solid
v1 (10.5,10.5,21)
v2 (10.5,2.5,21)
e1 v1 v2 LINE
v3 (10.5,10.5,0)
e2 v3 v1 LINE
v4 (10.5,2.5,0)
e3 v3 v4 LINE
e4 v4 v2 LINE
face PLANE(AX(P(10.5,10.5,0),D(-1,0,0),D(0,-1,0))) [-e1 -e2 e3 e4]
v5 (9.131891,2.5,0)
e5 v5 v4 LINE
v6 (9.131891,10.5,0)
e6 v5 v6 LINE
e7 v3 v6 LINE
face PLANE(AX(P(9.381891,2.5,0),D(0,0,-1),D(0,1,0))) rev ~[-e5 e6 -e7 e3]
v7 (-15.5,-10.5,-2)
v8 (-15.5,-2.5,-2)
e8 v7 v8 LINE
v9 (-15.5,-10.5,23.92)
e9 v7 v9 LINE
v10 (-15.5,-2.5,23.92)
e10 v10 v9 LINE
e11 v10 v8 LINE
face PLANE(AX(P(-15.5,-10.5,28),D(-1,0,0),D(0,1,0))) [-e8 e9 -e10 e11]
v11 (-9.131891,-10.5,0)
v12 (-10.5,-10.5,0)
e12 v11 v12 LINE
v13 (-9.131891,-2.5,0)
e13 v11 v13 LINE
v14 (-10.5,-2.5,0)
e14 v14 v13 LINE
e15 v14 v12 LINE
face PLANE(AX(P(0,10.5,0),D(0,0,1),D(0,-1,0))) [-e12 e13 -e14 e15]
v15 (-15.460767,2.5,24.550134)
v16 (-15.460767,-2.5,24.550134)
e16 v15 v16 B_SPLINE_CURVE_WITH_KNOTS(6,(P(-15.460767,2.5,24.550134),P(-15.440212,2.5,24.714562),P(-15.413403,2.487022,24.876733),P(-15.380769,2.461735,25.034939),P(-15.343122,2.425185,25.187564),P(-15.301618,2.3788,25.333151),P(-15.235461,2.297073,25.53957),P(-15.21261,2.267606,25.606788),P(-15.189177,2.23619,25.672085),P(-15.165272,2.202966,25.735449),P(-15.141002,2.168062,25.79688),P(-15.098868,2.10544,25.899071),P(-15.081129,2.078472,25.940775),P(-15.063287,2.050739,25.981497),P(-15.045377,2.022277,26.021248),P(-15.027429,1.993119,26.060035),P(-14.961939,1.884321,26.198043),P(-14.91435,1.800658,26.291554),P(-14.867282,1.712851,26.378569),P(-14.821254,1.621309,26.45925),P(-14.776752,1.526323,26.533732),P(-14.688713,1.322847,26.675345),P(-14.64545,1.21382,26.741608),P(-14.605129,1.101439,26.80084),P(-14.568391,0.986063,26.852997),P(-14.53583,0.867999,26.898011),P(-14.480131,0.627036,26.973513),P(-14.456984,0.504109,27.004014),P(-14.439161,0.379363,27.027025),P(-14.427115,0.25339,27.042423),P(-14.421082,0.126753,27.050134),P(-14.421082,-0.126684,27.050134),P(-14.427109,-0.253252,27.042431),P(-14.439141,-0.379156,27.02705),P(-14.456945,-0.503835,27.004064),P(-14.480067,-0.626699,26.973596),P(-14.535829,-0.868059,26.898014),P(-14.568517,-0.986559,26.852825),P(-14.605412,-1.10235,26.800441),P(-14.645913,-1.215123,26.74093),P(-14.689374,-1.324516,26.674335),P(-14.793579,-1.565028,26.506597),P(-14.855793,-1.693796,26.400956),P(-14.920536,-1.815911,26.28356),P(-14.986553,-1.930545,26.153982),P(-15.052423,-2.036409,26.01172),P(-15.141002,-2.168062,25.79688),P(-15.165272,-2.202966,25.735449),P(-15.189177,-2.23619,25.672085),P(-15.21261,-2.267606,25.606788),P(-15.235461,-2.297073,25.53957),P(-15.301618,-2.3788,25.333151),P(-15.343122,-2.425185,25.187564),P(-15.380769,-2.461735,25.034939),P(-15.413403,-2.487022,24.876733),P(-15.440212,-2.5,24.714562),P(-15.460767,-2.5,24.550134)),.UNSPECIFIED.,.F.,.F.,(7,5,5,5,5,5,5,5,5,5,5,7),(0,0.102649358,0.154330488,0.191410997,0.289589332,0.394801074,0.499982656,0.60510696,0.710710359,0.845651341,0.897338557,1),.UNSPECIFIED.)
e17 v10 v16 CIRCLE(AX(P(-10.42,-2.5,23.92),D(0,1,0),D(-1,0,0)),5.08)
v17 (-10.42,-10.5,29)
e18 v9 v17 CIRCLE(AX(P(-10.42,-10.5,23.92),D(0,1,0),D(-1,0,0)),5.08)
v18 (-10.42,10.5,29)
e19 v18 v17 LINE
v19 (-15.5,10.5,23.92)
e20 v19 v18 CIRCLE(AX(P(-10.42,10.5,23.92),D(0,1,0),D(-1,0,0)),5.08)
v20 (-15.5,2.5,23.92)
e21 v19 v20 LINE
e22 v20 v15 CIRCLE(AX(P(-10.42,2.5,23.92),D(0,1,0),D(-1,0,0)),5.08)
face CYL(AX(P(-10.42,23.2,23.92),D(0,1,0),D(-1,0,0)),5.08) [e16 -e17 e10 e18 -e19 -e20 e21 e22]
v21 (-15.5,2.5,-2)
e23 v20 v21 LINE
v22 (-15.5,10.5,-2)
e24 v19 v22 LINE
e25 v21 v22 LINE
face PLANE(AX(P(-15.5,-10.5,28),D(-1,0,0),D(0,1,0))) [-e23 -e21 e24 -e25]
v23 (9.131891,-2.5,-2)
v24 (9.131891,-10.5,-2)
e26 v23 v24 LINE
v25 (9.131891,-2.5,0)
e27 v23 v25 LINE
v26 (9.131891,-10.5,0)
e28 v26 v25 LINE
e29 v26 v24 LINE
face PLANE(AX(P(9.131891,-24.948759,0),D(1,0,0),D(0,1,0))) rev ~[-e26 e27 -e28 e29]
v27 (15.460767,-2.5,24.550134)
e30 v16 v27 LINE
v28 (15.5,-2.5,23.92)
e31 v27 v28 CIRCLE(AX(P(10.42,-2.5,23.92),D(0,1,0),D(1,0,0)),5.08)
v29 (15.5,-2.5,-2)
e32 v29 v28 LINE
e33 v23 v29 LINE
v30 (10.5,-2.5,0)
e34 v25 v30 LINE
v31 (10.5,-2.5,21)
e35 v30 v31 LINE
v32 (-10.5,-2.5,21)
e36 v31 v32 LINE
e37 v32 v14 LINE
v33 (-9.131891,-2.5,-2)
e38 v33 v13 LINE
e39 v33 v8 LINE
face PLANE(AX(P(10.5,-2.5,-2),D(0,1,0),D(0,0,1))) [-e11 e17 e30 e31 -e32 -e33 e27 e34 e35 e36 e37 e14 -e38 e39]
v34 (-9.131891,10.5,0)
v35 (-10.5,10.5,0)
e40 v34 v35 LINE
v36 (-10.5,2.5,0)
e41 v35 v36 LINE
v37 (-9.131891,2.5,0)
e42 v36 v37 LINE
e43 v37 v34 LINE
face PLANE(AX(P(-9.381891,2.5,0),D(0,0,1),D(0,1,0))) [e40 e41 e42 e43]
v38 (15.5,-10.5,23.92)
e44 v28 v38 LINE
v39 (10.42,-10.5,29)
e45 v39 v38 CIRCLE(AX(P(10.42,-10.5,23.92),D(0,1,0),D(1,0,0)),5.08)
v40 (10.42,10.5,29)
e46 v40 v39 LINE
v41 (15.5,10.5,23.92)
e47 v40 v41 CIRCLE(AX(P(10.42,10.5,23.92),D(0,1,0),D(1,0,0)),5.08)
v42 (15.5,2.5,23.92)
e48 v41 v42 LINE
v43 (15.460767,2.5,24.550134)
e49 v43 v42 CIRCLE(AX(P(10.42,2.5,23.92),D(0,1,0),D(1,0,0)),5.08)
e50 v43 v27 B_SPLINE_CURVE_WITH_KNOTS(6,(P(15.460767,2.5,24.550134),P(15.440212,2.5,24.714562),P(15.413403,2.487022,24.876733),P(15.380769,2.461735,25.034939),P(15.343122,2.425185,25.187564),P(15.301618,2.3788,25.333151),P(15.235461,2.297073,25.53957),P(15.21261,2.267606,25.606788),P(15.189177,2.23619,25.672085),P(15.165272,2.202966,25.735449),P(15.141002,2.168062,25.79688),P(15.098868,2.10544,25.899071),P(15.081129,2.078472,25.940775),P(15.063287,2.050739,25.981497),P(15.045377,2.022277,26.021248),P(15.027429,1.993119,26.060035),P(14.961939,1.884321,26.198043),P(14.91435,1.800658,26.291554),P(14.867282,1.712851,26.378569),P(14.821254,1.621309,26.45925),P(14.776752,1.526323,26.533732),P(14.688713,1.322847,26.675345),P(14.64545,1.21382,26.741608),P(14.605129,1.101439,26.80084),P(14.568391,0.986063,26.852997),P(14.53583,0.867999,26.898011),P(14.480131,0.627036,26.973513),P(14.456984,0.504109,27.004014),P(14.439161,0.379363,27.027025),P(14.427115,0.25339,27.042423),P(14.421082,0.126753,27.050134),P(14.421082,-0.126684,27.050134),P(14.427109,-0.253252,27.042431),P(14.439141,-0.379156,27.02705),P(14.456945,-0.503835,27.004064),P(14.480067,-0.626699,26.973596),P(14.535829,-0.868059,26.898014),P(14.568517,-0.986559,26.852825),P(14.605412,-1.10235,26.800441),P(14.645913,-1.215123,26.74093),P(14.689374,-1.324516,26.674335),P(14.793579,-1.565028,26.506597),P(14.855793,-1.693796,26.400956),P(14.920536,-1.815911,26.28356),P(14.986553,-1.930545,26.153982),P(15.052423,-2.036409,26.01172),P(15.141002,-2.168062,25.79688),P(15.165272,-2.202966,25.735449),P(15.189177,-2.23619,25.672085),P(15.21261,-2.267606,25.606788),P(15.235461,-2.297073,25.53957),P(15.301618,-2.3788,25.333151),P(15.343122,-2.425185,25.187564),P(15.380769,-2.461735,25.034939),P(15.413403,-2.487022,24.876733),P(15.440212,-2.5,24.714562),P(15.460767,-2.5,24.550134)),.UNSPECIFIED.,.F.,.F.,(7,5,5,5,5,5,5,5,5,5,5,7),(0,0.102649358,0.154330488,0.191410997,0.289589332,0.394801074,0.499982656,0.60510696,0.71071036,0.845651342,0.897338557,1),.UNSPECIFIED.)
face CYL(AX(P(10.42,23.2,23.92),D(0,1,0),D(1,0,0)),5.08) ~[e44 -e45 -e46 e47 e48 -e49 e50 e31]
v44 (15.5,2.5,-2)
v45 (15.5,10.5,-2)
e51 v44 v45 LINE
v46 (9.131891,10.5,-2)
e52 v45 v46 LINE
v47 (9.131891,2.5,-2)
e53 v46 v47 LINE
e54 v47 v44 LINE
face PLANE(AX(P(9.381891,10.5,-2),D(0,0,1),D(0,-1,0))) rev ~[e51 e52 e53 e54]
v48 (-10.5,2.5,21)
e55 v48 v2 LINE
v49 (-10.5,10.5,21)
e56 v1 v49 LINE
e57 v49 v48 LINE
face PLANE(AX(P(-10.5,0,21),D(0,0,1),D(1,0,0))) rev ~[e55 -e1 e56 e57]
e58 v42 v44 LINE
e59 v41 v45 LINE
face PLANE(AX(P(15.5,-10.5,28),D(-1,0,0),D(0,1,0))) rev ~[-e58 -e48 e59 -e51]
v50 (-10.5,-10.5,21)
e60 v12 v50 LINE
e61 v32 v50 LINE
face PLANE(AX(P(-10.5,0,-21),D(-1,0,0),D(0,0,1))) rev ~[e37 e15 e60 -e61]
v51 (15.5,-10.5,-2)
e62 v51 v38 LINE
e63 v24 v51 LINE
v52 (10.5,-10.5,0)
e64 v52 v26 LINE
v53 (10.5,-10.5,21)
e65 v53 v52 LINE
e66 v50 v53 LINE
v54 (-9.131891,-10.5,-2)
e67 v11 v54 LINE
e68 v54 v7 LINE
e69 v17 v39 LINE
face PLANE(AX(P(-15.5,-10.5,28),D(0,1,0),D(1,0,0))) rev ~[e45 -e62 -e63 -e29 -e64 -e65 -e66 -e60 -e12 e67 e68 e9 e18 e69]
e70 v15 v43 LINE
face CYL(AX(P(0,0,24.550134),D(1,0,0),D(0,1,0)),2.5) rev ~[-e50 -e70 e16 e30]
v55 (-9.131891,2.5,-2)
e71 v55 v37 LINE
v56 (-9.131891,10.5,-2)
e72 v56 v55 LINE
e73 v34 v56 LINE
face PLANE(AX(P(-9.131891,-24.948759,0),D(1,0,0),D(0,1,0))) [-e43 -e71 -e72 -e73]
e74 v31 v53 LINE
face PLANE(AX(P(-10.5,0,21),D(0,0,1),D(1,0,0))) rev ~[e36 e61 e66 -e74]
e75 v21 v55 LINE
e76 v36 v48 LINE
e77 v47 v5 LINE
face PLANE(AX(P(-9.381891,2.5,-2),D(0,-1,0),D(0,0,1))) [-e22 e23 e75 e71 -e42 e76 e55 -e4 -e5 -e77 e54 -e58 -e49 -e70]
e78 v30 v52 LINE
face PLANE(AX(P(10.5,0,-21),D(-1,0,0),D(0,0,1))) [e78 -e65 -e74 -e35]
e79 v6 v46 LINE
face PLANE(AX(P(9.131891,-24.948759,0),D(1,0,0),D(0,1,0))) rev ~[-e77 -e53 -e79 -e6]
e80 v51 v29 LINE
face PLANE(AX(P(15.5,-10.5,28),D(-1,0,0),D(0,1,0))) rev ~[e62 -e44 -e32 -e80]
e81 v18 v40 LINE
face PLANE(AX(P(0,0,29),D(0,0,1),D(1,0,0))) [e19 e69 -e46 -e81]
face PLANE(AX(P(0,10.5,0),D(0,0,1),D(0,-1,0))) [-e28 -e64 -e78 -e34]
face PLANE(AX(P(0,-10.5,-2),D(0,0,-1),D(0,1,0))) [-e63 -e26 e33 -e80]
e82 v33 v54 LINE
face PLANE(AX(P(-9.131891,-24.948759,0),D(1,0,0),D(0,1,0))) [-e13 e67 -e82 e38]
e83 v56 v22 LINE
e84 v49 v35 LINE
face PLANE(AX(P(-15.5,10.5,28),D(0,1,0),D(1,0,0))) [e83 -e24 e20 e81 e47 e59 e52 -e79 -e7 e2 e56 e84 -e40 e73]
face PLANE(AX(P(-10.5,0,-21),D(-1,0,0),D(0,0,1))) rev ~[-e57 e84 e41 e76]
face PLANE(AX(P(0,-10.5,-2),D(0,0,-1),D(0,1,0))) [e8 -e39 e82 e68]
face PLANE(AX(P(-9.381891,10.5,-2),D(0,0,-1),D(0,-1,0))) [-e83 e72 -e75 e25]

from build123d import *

# Parameters (mm, degrees)
F0_W         = 31
F0_H         = 21
F1_DEPTH     = 28
F2_W         = 21
F2_H         = 42
F3_DEPTH     = 50.8
F4_DEPTH     = 25.4
F6_DEPTH     = 25.4
F7_DEPTH     = 25.4
F8_DEPTH     = 2
F9_W         = 10.5
F9_H         = 2
F10_DEPTH    = 10.5
F11_DEPTH    = 10.5
F12_W        = 18.7637824565
F12_H        = 49.8975180089
F13_DEPTH    = 25.4
F14_DEPTH    = 25.4
F15_DEPTH    = 0.25
F16_DEPTH    = 0.25
F17_DEPTH    = 1
F18_T1_DEPTH = 46.4


# Not quite as in the source:
# - a fillet or chamfer that OpenCascade refuses, or shapes differently, is made with other operations: its cross-section is extruded or revolved along the edge and cut away or added


with BuildPart() as f1:
    # F0 (on Top) → F1 (new body)
    with BuildSketch(Plane.XY):
        Rectangle(F0_W, F0_H)
    extrude(amount=F1_DEPTH)

    # F2 (on Front) → F3 (cut)
    with BuildSketch(Plane.XZ):
        Rectangle(F2_W, F2_H)
    extrude(amount=-F3_DEPTH, mode=Mode.SUBTRACT)

    # F2 (on Front) → F4 (cut)
    with BuildSketch(Plane.XZ):
        Rectangle(F2_W, F2_H)
    extrude(amount=F4_DEPTH, mode=Mode.SUBTRACT)

    # F5 (on Right) → F6 (cut)
    with BuildSketch(Plane.YZ):
        with BuildLine():
            Line((0, 24.5501343161), (2.5, 24.5501343161))
            ThreePointArc((2.5, 24.5501343161), (0, 27.0501343161), (-2.5, 24.5501343161))
            Line((-2.5, 24.5501343161), (0, 24.5501343161))
        make_face()
        with BuildLine():
            Line((2.5, -28.5555105656), (2.5, 24.5501343161))
            ThreePointArc((2.5, 24.5501343161), (1.767766953, 22.7823673631), (0, 22.0501343161))
            Line((0, 22.0501343161), (0, -28.5555105656))
            Line((0, -28.5555105656), (2.5, -28.5555105656))
        make_face()
        with BuildLine():
            ThreePointArc((0, 22.0501343161), (1.767766953, 22.7823673631), (2.5, 24.5501343161))
            Line((2.5, 24.5501343161), (0, 24.5501343161))
            Line((0, 24.5501343161), (0, 22.0501343161))
        make_face()
        with BuildLine():
            Line((0, 24.5501343161), (-2.5, 24.5501343161))
            ThreePointArc((-2.5, 24.5501343161), (-1.767766953, 22.7823673631), (0, 22.0501343161))
            Line((0, 22.0501343161), (0, 24.5501343161))
        make_face()
        with BuildLine():
            ThreePointArc((0, 22.0501343161), (-1.767766953, 22.7823673631), (-2.5, 24.5501343161))
            Line((-2.5, 24.5501343161), (-2.5, -33.7370373309))
            Line((-2.5, -33.7370373309), (0, -33.7370373309))
            Line((0, -33.7370373309), (0, -28.5555105656))
            Line((0, -28.5555105656), (0, 22.0501343161))
        make_face()
    extrude(amount=-F6_DEPTH, mode=Mode.SUBTRACT)

    # F5 (on Right) → F7 (cut)
    with BuildSketch(Plane.YZ):
        with BuildLine():
            Line((0, 24.5501343161), (2.5, 24.5501343161))
            ThreePointArc((2.5, 24.5501343161), (0, 27.0501343161), (-2.5, 24.5501343161))
            Line((-2.5, 24.5501343161), (0, 24.5501343161))
        make_face()
        with BuildLine():
            Line((2.5, -28.5555105656), (2.5, 24.5501343161))
            ThreePointArc((2.5, 24.5501343161), (1.767766953, 22.7823673631), (0, 22.0501343161))
            Line((0, 22.0501343161), (0, -28.5555105656))
            Line((0, -28.5555105656), (2.5, -28.5555105656))
        make_face()
        with BuildLine():
            ThreePointArc((0, 22.0501343161), (1.767766953, 22.7823673631), (2.5, 24.5501343161))
            Line((2.5, 24.5501343161), (0, 24.5501343161))
            Line((0, 24.5501343161), (0, 22.0501343161))
        make_face()
        with BuildLine():
            Line((0, 24.5501343161), (-2.5, 24.5501343161))
            ThreePointArc((-2.5, 24.5501343161), (-1.767766953, 22.7823673631), (0, 22.0501343161))
            Line((0, 22.0501343161), (0, 24.5501343161))
        make_face()
        with BuildLine():
            ThreePointArc((0, 22.0501343161), (-1.767766953, 22.7823673631), (-2.5, 24.5501343161))
            Line((-2.5, 24.5501343161), (-2.5, -33.7370373309))
            Line((-2.5, -33.7370373309), (0, -33.7370373309))
            Line((0, -33.7370373309), (0, -28.5555105656))
            Line((0, -28.5555105656), (0, 22.0501343161))
        make_face()
    extrude(amount=F7_DEPTH, mode=Mode.SUBTRACT)

    # F8 (add): faces of the model
    f8_faces = [f1.faces().sort_by_distance(p)[0] for p in [
        (13, 6.5, 0),
        (13, -6.5, 0),
        (-13, -6.5, 0),
        (-13, 6.5, 0),
    ]]
    extrude(f8_faces, amount=F8_DEPTH)

    # F9 (on Right) → F10 (join)
    with BuildSketch(Plane.YZ):
        with Locations((-5.25, -1)):
            Rectangle(F9_W, F9_H)
        with Locations((5.25, -1)):
            Rectangle(F9_W, F9_H)
    extrude(amount=F10_DEPTH)

    # F11 (add): a face of the model
    f11_faces = [f1.faces().sort_by_distance(p)[0] for p in [
        (0, 0, -1),
    ]]
    extrude(f11_faces, amount=F11_DEPTH)

    # F12 (on Top) → F13 (cut)
    with BuildSketch(Plane.XY):
        Rectangle(F12_W, F12_H)
    extrude(amount=-F13_DEPTH, mode=Mode.SUBTRACT)

    # F14 (cut): a face of the model
    f14_faces = [f1.faces().sort_by_distance(p)[0] for p in [
        (10.5, 0, -1),
    ]]
    extrude(f14_faces, amount=-F14_DEPTH, mode=Mode.SUBTRACT)

    # F15 (add): faces of the model
    f15_faces = [f1.faces().sort_by_distance(p)[0] for p in [
        (9.3818912283, 6.5, -1),
        (9.3818912283, -6.5, -1),
    ]]
    extrude(f15_faces, amount=F15_DEPTH)

    # F16 (add): faces of the model
    f16_faces = [f1.faces().sort_by_distance(p)[0] for p in [
        (-9.3818912283, 6.5, -1),
        (-9.3818912283, -6.5, -1),
    ]]
    extrude(f16_faces, amount=F16_DEPTH)

    # F17 (add): a face of the model
    f17_faces = [f1.faces().sort_by_distance(p)[0] for p in [
        (0, 0, 28),
    ]]
    extrude(f17_faces, amount=F17_DEPTH)

    # F18: fillet of radius 5.08 on 2 edges, made by hand

    # F18_s2 → F18_t1 (cut)
    with BuildSketch(Plane.XZ.offset(-23.2)):
        with BuildLine():
            ThreePointArc((-15.5, 23.92), (-14.0121024484, 27.5121024484), (-10.42, 29))
            Line((-10.42, 29), (-15.5, 29))
            Line((-15.5, 29), (-15.5, 23.92))
        make_face()
        with BuildLine():
            ThreePointArc((15.5, 23.92), (14.0121024484, 27.5121024484), (10.42, 29))
            Line((10.42, 29), (15.5, 29))
            Line((15.5, 29), (15.5, 23.92))
        make_face()
    extrude(amount=F18_T1_DEPTH, mode=Mode.SUBTRACT)


solid = f1.part
